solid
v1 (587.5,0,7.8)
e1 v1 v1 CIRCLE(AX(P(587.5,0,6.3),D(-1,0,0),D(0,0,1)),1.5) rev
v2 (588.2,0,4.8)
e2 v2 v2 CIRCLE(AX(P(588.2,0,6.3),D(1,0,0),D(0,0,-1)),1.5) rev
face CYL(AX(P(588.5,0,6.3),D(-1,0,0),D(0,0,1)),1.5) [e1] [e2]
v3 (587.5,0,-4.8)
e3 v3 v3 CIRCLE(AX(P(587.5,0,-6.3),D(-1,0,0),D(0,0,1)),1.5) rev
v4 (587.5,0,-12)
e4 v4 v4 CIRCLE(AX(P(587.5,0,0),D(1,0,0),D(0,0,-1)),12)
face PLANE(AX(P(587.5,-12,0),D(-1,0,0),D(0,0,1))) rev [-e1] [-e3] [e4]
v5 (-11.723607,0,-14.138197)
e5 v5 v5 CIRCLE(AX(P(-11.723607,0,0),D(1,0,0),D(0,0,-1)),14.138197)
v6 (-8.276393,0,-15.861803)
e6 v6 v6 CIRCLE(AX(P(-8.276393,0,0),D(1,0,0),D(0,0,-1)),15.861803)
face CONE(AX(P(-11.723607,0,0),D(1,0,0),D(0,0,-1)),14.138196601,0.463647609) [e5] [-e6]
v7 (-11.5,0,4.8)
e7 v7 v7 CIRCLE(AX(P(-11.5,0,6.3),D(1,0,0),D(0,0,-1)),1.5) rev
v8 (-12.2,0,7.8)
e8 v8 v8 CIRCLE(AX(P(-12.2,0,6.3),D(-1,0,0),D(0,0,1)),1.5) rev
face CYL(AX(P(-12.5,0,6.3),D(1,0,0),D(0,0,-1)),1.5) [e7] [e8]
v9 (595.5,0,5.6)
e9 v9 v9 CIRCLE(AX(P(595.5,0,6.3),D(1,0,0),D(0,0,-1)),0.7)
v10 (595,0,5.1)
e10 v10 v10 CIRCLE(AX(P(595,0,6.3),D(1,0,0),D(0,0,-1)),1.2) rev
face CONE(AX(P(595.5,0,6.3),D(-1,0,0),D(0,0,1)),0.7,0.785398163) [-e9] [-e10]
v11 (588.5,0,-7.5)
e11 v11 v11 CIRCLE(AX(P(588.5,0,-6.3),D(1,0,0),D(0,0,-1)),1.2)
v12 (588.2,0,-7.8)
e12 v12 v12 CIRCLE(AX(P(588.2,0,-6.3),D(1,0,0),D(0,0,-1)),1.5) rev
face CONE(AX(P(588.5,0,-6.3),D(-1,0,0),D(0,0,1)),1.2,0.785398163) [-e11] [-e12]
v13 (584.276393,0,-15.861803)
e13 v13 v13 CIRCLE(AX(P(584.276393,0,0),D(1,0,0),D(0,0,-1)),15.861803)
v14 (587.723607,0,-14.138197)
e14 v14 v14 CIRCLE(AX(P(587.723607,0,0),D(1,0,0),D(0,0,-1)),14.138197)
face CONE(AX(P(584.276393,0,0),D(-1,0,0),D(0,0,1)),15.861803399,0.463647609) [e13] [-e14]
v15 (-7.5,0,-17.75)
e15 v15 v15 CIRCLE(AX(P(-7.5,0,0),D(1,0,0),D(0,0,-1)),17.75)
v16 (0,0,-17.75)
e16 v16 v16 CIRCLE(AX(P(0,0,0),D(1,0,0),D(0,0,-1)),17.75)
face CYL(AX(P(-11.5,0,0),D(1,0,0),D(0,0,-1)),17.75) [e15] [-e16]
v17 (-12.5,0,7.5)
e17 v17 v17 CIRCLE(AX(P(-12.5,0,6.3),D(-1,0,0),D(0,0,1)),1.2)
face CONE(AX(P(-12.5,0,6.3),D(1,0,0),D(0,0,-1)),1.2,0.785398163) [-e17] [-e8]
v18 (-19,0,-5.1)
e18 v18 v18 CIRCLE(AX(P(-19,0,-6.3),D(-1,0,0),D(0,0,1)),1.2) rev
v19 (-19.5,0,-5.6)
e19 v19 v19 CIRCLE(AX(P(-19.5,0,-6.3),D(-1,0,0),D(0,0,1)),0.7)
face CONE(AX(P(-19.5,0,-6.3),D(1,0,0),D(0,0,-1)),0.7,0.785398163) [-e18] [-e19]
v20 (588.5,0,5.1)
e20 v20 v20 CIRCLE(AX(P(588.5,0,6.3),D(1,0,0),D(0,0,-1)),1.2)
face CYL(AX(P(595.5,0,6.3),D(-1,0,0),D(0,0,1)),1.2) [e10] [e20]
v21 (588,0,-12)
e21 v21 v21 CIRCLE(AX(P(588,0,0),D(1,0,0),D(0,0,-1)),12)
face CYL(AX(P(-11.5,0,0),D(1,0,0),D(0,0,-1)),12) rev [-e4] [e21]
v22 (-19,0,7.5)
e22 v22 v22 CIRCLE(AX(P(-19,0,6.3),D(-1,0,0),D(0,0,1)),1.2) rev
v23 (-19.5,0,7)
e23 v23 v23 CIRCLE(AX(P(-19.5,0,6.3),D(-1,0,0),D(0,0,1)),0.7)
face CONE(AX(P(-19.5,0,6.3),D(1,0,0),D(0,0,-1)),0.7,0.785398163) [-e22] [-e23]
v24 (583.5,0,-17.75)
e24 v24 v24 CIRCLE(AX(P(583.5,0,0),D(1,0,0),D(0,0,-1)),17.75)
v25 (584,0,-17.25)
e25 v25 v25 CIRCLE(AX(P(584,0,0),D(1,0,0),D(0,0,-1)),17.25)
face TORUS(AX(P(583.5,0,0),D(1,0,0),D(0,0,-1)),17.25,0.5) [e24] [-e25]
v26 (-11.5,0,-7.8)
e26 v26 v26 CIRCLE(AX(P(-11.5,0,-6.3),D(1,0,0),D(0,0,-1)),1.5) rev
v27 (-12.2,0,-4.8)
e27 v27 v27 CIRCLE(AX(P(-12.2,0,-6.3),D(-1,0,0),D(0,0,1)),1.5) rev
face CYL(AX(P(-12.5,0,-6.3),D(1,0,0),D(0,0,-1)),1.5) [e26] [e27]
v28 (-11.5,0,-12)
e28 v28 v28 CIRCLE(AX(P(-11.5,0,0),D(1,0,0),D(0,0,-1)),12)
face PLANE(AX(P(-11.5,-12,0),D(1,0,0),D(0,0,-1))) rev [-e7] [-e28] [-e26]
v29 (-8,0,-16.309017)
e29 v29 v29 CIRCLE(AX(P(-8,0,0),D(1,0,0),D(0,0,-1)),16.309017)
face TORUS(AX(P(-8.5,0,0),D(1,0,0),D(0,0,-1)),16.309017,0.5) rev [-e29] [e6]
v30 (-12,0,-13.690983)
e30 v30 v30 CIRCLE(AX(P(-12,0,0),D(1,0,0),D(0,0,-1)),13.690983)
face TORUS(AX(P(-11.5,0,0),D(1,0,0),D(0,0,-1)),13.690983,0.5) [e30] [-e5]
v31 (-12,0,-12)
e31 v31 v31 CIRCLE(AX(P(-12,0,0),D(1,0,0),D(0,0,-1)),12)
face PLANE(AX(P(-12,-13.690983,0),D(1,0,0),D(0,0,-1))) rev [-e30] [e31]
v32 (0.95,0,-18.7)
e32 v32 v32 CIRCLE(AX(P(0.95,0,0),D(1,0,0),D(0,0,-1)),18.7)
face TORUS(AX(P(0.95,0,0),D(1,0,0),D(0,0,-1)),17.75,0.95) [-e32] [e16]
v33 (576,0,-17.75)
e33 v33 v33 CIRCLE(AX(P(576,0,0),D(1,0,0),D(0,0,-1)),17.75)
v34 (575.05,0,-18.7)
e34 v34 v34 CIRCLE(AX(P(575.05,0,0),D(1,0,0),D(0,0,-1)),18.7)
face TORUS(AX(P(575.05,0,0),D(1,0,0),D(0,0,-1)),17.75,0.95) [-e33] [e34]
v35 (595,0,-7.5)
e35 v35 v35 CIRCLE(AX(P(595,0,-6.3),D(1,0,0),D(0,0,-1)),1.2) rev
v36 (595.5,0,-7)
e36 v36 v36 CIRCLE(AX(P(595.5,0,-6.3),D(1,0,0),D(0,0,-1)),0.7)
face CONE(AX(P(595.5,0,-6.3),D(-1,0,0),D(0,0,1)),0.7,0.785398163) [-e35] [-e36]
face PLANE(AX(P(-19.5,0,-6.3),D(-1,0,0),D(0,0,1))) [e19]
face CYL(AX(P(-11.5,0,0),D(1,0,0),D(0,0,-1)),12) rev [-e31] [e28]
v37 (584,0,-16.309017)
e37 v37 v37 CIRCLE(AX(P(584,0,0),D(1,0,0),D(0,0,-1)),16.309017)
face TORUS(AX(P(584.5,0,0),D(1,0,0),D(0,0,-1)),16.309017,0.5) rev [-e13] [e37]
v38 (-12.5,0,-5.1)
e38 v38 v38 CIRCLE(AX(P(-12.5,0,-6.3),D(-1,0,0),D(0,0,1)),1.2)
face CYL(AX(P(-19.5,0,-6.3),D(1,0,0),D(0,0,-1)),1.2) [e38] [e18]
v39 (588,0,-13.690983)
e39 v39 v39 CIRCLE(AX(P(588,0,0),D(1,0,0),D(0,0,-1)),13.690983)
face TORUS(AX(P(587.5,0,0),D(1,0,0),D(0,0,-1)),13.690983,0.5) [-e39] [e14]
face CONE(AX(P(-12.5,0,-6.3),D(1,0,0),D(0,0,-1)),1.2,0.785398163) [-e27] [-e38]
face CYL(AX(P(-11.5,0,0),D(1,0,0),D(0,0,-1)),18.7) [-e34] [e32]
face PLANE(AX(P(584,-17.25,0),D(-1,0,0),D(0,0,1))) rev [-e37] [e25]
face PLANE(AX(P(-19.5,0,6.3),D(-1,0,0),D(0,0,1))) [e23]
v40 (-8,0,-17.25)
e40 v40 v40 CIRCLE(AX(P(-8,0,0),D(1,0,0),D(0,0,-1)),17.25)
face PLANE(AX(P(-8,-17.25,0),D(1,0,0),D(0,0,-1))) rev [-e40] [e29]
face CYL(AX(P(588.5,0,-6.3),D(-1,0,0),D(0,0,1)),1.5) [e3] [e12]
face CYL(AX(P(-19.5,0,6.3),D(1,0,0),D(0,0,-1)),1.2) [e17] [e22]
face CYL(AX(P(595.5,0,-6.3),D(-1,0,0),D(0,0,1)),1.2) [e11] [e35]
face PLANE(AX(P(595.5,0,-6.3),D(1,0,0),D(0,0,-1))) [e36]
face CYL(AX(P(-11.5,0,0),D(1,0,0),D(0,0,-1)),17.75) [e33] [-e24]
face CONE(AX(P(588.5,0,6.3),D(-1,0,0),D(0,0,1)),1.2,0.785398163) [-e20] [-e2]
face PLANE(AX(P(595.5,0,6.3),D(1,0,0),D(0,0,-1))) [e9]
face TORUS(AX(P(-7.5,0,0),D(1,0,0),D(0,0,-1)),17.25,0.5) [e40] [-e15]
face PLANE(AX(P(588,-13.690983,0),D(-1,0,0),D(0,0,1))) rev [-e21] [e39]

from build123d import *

# Parameters (mm, degrees)
SKETCH2_R      = 1.2
EXTRUDE1_DEPTH = 8
SKETCH3_R      = 1.5
EXTRUDE2_DEPTH = 1
EXTRUDE3_START = 8
SKETCH4_R      = 1.2
EXTRUDE3_DEPTH = 8
EXTRUDE4_START = 1
SKETCH5_R      = 1.5
EXTRUDE4_DEPTH = 1
CHAMFER1_SIZE  = 0.3
CHAMFER2_SIZE  = 0.5


with BuildPart() as part:
    # Sketch1 → Revolve1 (revolve)
    with BuildSketch(Plane.XY, mode=Mode.PRIVATE) as revolve1_sk:
        with BuildLine():
            Line((0, -17.75), (-7.5, -17.75))
            ThreePointArc((-7.5, -17.75), (-7.853553391, -17.603553391), (-8, -17.25))
            Line((-8, -17.25), (-8, -16.309016994))
            ThreePointArc((-8, -16.309016994), (-8.074674596, -16.046151438), (-8.276393202, -15.861803399))
            Line((-8.276393202, -15.861803399), (-11.723606798, -14.138196601))
            ThreePointArc((-11.723606798, -14.138196601), (-11.925325404, -13.953848562), (-12, -13.690983006))
            Line((-12, -13.690983006), (-12, -12))
            Line((-12, -12), (-11.5, -12))
            Line((-11.5, -12), (-11.5, 0))
            Line((-11.5, 0), (0, 0))
            Line((0, 0), (576, 0))
            Line((576, 0), (587.5, 0))
            Line((587.5, 0), (587.5, -12))
            Line((587.5, -12), (588, -12))
            Line((588, -12), (588, -13.690983006))
            ThreePointArc((588, -13.690983006), (587.925325404, -13.953848562), (587.723606798, -14.138196601))
            Line((587.723606798, -14.138196601), (584.276393202, -15.861803399))
            ThreePointArc((584.276393202, -15.861803399), (584.074674596, -16.046151438), (584, -16.309016994))
            Line((584, -16.309016994), (584, -17.25))
            ThreePointArc((584, -17.25), (583.853553391, -17.603553391), (583.5, -17.75))
            Line((583.5, -17.75), (576, -17.75))
            ThreePointArc((576, -17.75), (575.721751442, -18.421751442), (575.05, -18.7))
            Line((575.05, -18.7), (0.95, -18.7))
            ThreePointArc((0.95, -18.7), (0.278248558, -18.421751442), (0, -17.75))
        make_face()
    revolve(revolve1_sk.sketch.rotate(Axis((-11.5, 0, 0), (-1, 0, 0)), 270), axis=Axis((-11.5, 0, 0), (-1, 0, 0)))

    # Sketch2 → Extrude1 (add)
    with BuildSketch(Plane.ZY.offset(11.5)):
        with Locations(Location((-6.3, 0, 0), (0, 0, 180))):
            Circle(SKETCH2_R)
        with Locations(Location((6.3, 0, 0), (0, 0, 180))):
            Circle(SKETCH2_R)
    extrude(amount=EXTRUDE1_DEPTH)

    # Sketch3 → Extrude2 (add)
    with BuildSketch(Plane.ZY.offset(11.5)):
        with Locations(Location((-6.3, 0, 0), (0, 0, 180))):
            Circle(SKETCH3_R)
        with Locations(Location((6.3, 0, 0), (0, 0, 180))):
            Circle(SKETCH3_R)
    extrude(amount=EXTRUDE2_DEPTH)

    # Sketch4 → Extrude3 (add)
    with BuildSketch(Plane(origin=(587.5, 0, 0), x_dir=(0, 0, -1), z_dir=(1, 0, 0)).offset(EXTRUDE3_START)):
        with Locations(Location((6.3, 0, 0), (0, 0, 180))):
            Circle(SKETCH4_R)
        with Locations(Location((-6.3, 0, 0), (0, 0, 180))):
            Circle(SKETCH4_R)
    extrude(amount=-EXTRUDE3_DEPTH)

    # Sketch5 → Extrude4 (add)
    with BuildSketch(Plane(origin=(587.5, 0, 0), x_dir=(0, 0, -1), z_dir=(1, 0, 0)).offset(EXTRUDE4_START)):
        with Locations((6.3, 0)):
            Circle(SKETCH5_R)
        with Locations((-6.3, 0)):
            Circle(SKETCH5_R)
    extrude(amount=-EXTRUDE4_DEPTH)

    # Chamfer1
    chamfer1_edges = [part.edges().sort_by_distance(p)[0] for p in [
        (-12.5, 0, -4.8),
        (-12.5, 0, 7.8),
        (588.5, 0, -4.8),
        (588.5, 0, 7.8),
    ]]
    chamfer(chamfer1_edges, length=CHAMFER1_SIZE - 0.0001)  # a hair under: the kernel refuses the full size

    # Chamfer2
    chamfer2_edges = [part.edges().sort_by_distance(p)[0] for p in [
        (-19.5, 0, -5.1),
        (-19.5, 0, 7.5),
        (595.5, 0, -7.5),
        (595.5, 0, 5.1),
    ]]
    chamfer(chamfer2_edges, length=CHAMFER2_SIZE)


solid = part.part
